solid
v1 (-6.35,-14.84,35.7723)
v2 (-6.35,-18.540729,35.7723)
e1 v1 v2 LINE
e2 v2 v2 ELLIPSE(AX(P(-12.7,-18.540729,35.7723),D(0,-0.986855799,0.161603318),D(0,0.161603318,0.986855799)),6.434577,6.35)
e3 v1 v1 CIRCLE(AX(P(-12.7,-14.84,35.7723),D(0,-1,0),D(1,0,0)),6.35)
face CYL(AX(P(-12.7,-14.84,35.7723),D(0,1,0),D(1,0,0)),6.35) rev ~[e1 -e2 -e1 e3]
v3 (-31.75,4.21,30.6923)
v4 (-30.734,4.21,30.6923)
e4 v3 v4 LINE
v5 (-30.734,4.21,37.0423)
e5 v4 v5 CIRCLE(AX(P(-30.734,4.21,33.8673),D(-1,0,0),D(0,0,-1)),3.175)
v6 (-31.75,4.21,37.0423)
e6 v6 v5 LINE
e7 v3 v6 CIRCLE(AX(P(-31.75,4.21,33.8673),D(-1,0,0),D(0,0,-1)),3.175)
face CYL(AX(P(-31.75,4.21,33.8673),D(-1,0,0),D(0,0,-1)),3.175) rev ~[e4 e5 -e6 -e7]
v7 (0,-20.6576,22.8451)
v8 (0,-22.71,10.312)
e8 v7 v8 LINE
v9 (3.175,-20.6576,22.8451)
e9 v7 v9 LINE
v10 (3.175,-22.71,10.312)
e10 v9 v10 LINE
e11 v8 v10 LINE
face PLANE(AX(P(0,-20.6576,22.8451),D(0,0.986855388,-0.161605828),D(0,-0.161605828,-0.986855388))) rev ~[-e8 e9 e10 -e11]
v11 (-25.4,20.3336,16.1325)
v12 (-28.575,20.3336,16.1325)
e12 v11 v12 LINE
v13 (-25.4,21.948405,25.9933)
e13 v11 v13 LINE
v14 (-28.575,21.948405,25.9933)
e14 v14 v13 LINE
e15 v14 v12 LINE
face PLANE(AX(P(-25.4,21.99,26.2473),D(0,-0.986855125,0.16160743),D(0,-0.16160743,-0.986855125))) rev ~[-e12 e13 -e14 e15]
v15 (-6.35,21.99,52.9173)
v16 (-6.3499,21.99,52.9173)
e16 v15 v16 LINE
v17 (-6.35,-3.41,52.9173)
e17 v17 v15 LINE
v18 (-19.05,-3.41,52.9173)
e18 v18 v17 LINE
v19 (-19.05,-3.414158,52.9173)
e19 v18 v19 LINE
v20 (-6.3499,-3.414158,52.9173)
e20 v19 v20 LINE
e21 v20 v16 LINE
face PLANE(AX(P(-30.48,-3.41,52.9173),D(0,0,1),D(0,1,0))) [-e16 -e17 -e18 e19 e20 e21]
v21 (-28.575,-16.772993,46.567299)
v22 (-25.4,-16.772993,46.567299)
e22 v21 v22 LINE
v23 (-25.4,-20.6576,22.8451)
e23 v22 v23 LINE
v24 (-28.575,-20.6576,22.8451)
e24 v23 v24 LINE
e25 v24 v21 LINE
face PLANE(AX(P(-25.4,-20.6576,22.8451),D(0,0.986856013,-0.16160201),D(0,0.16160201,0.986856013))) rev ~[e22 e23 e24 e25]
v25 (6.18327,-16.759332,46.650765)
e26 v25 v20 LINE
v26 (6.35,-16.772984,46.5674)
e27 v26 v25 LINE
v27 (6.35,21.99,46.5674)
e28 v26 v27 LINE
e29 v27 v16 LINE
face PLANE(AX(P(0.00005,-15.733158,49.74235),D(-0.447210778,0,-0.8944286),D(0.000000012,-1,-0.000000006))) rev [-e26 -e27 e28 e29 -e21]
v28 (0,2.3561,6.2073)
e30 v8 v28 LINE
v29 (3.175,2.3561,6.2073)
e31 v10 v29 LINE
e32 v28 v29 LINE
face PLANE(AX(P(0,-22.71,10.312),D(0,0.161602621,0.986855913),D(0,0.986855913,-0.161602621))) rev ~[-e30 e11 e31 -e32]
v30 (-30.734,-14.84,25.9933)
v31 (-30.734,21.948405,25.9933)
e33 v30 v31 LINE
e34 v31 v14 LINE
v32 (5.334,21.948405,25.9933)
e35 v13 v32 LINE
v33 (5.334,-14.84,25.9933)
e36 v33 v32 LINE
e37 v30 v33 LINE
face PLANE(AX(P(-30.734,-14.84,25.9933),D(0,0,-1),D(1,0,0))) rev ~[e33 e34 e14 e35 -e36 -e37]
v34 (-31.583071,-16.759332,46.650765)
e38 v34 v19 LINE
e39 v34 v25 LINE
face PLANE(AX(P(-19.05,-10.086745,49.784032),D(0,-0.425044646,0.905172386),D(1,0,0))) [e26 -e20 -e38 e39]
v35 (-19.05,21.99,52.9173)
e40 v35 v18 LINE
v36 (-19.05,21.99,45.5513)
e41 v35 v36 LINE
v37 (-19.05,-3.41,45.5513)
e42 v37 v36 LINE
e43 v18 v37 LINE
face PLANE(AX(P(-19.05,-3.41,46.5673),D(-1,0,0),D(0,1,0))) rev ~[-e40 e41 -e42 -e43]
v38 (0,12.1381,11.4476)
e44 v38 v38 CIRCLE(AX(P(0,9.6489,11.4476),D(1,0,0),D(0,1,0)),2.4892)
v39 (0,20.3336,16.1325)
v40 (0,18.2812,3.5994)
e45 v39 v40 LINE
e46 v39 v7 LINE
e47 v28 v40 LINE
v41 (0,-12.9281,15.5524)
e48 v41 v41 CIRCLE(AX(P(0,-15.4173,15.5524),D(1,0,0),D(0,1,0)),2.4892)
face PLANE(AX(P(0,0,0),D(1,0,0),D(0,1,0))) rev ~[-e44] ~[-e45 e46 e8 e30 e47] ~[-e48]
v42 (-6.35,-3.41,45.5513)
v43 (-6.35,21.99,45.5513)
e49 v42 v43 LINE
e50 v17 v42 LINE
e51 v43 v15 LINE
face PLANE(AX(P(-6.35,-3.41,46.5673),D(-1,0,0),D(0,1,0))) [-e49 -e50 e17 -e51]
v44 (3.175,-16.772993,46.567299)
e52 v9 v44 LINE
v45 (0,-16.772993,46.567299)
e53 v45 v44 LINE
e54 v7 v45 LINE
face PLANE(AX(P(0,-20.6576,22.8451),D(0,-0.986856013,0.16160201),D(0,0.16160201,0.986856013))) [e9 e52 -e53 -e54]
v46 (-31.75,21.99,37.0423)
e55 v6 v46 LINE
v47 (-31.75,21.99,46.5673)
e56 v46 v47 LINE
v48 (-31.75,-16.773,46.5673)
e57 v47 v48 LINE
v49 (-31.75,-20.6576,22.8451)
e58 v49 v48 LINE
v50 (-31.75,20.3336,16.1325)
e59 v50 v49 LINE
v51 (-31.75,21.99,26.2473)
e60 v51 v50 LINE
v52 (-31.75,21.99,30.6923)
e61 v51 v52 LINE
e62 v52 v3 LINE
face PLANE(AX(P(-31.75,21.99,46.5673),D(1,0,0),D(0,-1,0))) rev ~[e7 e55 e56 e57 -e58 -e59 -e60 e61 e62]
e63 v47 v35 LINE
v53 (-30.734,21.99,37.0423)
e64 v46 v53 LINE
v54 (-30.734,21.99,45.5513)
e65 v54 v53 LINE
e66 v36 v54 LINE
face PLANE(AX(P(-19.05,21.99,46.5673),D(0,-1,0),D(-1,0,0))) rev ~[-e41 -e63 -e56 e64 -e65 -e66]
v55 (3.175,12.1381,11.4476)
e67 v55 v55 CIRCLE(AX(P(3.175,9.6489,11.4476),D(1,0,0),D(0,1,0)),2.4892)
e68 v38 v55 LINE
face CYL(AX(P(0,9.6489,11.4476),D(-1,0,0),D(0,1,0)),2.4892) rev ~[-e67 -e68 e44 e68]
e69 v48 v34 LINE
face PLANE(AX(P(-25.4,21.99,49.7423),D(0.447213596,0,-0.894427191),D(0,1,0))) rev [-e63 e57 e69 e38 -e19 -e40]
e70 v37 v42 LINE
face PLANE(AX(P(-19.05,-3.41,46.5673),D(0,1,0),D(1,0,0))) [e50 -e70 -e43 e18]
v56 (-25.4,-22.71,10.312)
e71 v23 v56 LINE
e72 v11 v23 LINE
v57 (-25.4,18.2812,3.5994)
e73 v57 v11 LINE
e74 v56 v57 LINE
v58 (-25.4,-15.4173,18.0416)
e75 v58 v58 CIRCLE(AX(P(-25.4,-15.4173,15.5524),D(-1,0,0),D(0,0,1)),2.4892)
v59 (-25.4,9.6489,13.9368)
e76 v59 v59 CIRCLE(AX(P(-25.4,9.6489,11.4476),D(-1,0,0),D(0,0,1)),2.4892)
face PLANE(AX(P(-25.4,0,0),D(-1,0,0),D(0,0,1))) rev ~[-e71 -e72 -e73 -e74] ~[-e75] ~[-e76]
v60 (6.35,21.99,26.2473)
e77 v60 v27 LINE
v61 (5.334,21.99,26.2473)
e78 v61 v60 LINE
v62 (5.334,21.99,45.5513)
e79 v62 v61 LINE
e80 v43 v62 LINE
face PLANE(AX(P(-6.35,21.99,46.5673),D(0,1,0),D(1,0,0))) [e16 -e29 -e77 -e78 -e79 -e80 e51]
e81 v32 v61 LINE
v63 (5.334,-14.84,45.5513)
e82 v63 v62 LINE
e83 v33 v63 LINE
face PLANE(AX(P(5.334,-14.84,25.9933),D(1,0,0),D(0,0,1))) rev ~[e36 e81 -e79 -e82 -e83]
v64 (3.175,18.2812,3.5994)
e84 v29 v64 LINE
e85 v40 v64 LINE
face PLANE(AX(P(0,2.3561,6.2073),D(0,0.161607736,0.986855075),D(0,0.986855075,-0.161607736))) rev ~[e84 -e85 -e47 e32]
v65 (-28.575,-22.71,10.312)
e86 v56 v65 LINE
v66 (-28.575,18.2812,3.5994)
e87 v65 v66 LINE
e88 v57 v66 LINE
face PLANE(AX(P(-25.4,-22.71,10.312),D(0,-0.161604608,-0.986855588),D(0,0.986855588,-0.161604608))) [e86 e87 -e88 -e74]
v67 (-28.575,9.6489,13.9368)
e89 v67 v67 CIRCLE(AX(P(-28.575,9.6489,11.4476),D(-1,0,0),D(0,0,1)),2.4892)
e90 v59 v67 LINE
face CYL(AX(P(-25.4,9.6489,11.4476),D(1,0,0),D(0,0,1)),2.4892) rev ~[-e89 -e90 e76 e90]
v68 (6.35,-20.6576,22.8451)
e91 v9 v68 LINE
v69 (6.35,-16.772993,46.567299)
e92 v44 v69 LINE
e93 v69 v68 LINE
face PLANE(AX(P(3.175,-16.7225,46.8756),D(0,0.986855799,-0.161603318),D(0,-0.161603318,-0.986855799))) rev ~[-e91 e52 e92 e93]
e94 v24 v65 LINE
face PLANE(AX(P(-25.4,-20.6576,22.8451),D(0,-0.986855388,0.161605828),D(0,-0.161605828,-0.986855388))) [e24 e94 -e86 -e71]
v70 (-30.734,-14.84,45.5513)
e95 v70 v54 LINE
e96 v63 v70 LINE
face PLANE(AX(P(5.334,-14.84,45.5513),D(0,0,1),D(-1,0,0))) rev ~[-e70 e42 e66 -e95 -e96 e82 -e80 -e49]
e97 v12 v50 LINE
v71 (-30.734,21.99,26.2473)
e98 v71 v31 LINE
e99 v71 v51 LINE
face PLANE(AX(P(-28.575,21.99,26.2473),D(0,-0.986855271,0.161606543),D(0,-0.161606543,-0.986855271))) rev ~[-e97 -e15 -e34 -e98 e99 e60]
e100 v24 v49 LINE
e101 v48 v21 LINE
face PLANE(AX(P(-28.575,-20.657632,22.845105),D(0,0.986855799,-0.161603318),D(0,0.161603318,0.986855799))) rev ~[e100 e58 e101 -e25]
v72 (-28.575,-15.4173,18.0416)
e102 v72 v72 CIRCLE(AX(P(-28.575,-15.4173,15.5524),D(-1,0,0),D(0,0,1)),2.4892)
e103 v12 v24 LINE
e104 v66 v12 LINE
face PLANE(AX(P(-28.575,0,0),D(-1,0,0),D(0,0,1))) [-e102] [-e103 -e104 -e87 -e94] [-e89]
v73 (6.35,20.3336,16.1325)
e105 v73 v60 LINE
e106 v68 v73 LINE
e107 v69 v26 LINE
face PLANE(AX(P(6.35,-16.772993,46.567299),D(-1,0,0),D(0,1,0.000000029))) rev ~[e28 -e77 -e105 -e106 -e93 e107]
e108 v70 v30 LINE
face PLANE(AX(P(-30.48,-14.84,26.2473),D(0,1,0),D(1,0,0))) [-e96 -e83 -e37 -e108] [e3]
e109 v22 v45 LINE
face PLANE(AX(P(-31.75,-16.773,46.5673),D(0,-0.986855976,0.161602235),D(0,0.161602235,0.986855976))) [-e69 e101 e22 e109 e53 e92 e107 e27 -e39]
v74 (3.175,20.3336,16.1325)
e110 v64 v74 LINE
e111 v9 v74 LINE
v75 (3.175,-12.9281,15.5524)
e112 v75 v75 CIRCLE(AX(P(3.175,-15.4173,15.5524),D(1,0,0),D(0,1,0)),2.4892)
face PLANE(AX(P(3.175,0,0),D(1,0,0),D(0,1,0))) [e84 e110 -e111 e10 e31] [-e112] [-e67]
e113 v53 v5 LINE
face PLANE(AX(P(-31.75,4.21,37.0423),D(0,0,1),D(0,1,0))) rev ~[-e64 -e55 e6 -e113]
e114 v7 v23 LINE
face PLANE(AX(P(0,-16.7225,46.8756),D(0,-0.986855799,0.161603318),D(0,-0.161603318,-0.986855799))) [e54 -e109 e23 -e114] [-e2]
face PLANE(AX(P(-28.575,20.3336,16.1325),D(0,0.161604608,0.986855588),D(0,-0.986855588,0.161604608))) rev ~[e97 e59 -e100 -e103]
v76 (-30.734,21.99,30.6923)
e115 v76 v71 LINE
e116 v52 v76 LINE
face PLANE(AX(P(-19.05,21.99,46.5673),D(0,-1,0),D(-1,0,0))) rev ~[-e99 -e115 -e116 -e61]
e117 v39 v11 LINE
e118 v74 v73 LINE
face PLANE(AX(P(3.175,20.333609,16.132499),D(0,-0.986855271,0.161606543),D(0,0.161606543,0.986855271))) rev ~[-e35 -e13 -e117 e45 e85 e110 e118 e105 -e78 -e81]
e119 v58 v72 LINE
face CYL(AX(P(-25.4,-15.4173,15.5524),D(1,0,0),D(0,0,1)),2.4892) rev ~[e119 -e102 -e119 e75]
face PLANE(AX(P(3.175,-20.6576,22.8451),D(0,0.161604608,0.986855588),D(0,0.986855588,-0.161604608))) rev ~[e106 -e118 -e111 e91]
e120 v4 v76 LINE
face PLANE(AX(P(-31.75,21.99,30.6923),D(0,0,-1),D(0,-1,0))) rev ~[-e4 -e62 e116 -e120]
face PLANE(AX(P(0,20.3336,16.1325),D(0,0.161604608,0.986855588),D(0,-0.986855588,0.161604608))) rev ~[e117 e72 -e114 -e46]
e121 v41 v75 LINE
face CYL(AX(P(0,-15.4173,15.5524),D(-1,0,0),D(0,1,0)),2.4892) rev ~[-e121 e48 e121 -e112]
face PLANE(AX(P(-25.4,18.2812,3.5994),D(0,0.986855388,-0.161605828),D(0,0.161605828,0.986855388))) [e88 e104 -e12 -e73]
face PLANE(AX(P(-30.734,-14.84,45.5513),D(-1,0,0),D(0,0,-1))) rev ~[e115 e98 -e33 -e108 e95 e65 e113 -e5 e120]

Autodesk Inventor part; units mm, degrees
ref_plane "YZ Plane Vertical Spine" through (0, 0, 0) normal (1, 0, 0) x (0, 1, 0)
ref_plane "XZ Plane Horizontal" through (0, 0, 0) normal (0, 1, 0) x (-1, 0, 0)
ref_plane "XY Plane Vertical Span" through (0, 0, 0) normal (0, 0, 1) x (1, 0, 0)
sketch "Sketch1" plane through (0, 0, 0) normal (1, 0, 0) x (0, 1, 0)
  circle A0 centre (9.6489, 11.4476) radius 2.4892
  line L0 (2.3561, 6.2073) -> (18.2812, 3.5994)
  line L1 (33.7025, 135.9395) -> (135.3025, 135.9395) construction
  line L2 (21.99, 26.2473) -> (-14.84, 26.2473)
  line L3 (4.4085, 18.7403) -> (-20.6576, 22.8451)
  line L4 (-20.6576, 22.8451) -> (-22.71, 10.312)
  line L5 (-22.71, 10.312) -> (2.3561, 6.2073)
  circle A1 centre (-15.4173, 15.5524) radius 2.4892
  line L6 (-14.84, 26.2473) -> (-14.84, 46.5673)
  line L7 (-20.6576, 22.8451) -> (-16.7225, 46.8756)
  line L8 (-16.7225, 46.8756) -> (-14.84, 46.5673)
  line L9 (21.99, 26.2473) -> (18.2812, 3.5994)
  line L10 (20.3336, 16.1325) -> (4.4085, 18.7403)
  dimension "d11" = 12.7
  dimension "d13" = 4.9784
  dimension "d14" = 20.32
extrude "Extrusion1" add sketch "Sketch1" along normal blind 3.175
sketch "Sketch2" plane through (0, 0, 0) normal (-1, 0, 0) x (0, 0, 1)
  line L0 (26.2473, 21.99) -> (26.2473, -14.84) projected
  line L1 (3.5994, 18.2812) -> (26.2473, 21.99) projected
  line L2 (26.2473, -14.84) -> (46.5673, -14.84) projected
  line L3 (46.8756, -16.7225) -> (10.312, -22.71) projected
  line L4 (16.1325, 20.3336) -> (22.8451, -20.6576)
  line L5 (16.1325, 20.3336) -> (26.2473, 21.99)
  line L6 (26.2473, 21.5334) -> (26.2473, -14.84)
  line L7 (26.2473, -14.84) -> (46.5673, -14.84)
  line L8 (46.5673, -14.84) -> (46.8756, -16.7225)
  line L9 (46.8756, -16.7225) -> (22.8451, -20.6576)
extrude "Extrusion2" add sketch "Sketch2" along normal blind 25.4
sketch "Sketch3" plane through (-25.4, 0, 0) normal (-1, 0, 0) x (0, 0, 1)
  line L0 (26.2473, -14.84) -> (26.2473, 21.99) projected
  line L1 (3.5994, 18.2812) -> (16.1325, 20.3336) projected
  line L2 (26.2473, 21.99) -> (16.1325, 20.3336) projected
  line L3 (46.5673, -14.84) -> (26.2473, -14.84) projected
  line L4 (46.8756, -16.7225) -> (46.5673, -14.84) projected
  line L5 (22.8451, -20.6576) -> (46.8756, -16.7225) projected
  line L6 (22.8451, -20.6576) -> (10.312, -22.71) projected
  line L7 (10.312, -22.71) -> (3.5994, 18.2812) projected
  circle A0 centre (15.5524, -15.4173) radius 2.4892 projected
  circle A1 centre (11.4476, 9.6489) radius 2.4892 projected
extrude "Extrusion3" add sketch "Sketch3" along normal blind 3.175
sketch "Sketch4" plane through (-28.575, 0, 0) normal (-1, 0, 0) x (0, 0, 1)
  line L0 (26.2473, 21.99) -> (3.5994, 18.2812) projected
  line L1 (26.2473, -14.84) -> (26.2473, 21.99) projected
  line L2 (46.5673, -14.84) -> (26.2473, -14.84) projected
  line L3 (46.8756, -16.7225) -> (46.5673, -14.84) projected
  line L4 (10.312, -22.71) -> (46.8756, -16.7225) projected
  line L5 (46.8756, -16.7225) -> (46.5673, -14.84) projected
  line L6 (46.5673, -14.84) -> (26.2473, -14.84) projected
  line L7 (26.2473, -14.84) -> (26.2473, 21.99) projected
  line L8 (26.2473, 21.99) -> (3.5994, 18.2812) projected
  line L9 (3.5994, 18.2812) -> (10.312, -22.71) projected
  line L10 (10.312, -22.71) -> (46.8756, -16.7225) projected
  circle A0 centre (11.4476, 9.6489) radius 2.4892 projected
  circle A1 centre (15.5524, -15.4173) radius 2.4892 projected
  line L11 (16.1325, 20.3336) -> (22.8451, -20.6576)
  line L12 (16.1325, 20.3336) -> (26.2473, 21.99)
  line L13 (26.2473, 21.99) -> (26.2473, -14.84)
  line L14 (46.5673, -14.84) -> (26.2473, -14.84)
  line L15 (46.5673, -14.84) -> (46.8756, -16.7225)
  line L16 (46.8756, -16.7225) -> (22.8451, -20.6576)
extrude "Extrusion4" add sketch "Sketch4" along normal blind 3.175 contours L1 L2 L3 L4 L11 L0
sketch "Sketch5" plane through (3.175, 0, 0) normal (1, 0, 0) x (0, 0, -1)
  line L0 (-22.8451, -20.6576) -> (-16.1325, 20.3336) projected
  line L1 (-46.8756, -16.7225) -> (-10.312, -22.71) projected
  line L2 (-26.2473, -14.84) -> (-46.5673, -14.84) projected
  line L3 (-26.2473, 21.99) -> (-26.2473, -14.84) projected
  line L4 (-3.5994, 18.2812) -> (-26.2473, 21.99) projected
  line L5 (-26.2473, 21.99) -> (-16.1325, 20.3336)
  line L6 (-16.1325, 20.3336) -> (-22.8451, -20.6576)
  line L7 (-22.8451, -20.6576) -> (-46.8756, -16.7225)
  line L8 (-46.8756, -16.7225) -> (-46.5673, -14.84)
  line L9 (-46.5673, -14.84) -> (-26.2473, -14.84)
  line L10 (-26.2473, -14.84) -> (-26.2473, 21.99)
extrude "Extrusion5" add sketch "Sketch5" along normal blind 3.175
sketch "Sketch6" plane through (-31.75, -14.84, 46.5673) normal (0, 1, 0) x (1, 0, 0)
  line L0 (38.1, 20.32) -> (38.1, 0) projected
  line L1 (0, 0) -> (0, 20.32) projected
  line L2 (0, 20.32) -> (1.27, 20.32)
  line L3 (0, 0) -> (1.27, 0)
  line L4 (1.27, 0) -> (1.27, 20.32)
  line L5 (38.1, 0) -> (38.1, 20.32)
  line L6 (38.1, 20.32) -> (36.83, 20.32)
  line L7 (36.83, 20.32) -> (36.83, 0)
  line L8 (36.83, 0) -> (38.1, 0)
  dimension "d24" = 1.27
  dimension "d25" = 1.27
  dimension "d26" = 1.27
extrude "Extrusion6" add sketch "Sketch6" along normal blind 36.83
sketch "Sketch7" plane through (-30.48, -14.84, 26.2473) normal (0, 1, 0) x (1, 0, 0)
  line L0 (0, -20.32) -> (35.56, -20.32) projected
  line L1 (0, -19.05) -> (35.56, -19.05)
  line L2 (0, -20.32) -> (35.56, -20.32)
  line L3 (35.56, -19.05) -> (35.56, -20.32)
  line L4 (0, -19.05) -> (0, -20.32)
  dimension "d29" = 1.27
extrude "Extrusion7" add sketch "Sketch7" along normal blind 11.43
sketch "Sketch8" plane through (-30.48, -14.84, 26.2473) normal (1, 0, 0) x (0, 0, -1)
  line L0 (-20.32, 11.43) -> (-20.32, 36.83) projected
  line L1 (-19.05, 11.43) -> (-19.05, 36.83)
  line L2 (-19.05, 36.83) -> (-20.32, 36.83)
  line L3 (-19.05, 11.43) -> (-20.32, 11.43)
  line L4 (-20.32, 11.43) -> (-20.32, 36.83)
  dimension "d32" = 1.27
extrude "Extrusion8" add sketch "Sketch8" along normal blind 11.43
sketch "Sketch9" plane through (5.08, -14.84, 26.2473) normal (-1, 0, 0) x (0, 0, 1)
  line L0 (20.32, 11.43) -> (20.32, 36.83) projected
  line L1 (19.0567, 11.43) -> (19.0567, 36.83)
  line L2 (19.0567, 36.83) -> (20.32, 36.83)
  line L3 (20.32, 36.83) -> (20.32, 11.43)
  line L4 (20.32, 11.43) -> (19.0567, 11.43)
extrude "Extrusion9" add sketch "Sketch9" along normal blind 11.43
sketch "Sketch10" plane through (-31.75, 0, 0) normal (-1, 0, 0) x (0, 0, 1)
  line L0 (46.5673, -14.84) -> (46.5673, 21.99) projected
  line L1 (22.8451, -20.6576) -> (46.8756, -16.7225) projected
  line L2 (46.5673, -14.84) -> (46.5673, -16.773)
  line L3 (46.5673, -16.773) -> (47.6603, -17.0438)
  line L4 (47.6603, -17.0438) -> (46.5673, -14.84)
extrude "Extrusion10" cut sketch "Sketch10" against normal blind 50.8
thicken "Thicken1" operation add thickness 6.35 both sides no extend neighbours no toward (0, 0, 1) faces at (-10.5833, -12.3187, 46.5673)
sketch "Sketch11" plane through (-31.75, 0, 0) normal (-1, 0, 0) x (0, 0, 1)
  line L0 (22.8451, -20.6576) -> (46.5673, -16.773) projected
  line L1 (46.5673, -16.773) -> (55.5301, -15.3053)
  line L2 (55.5301, -15.3053) -> (55.5301, -20.6762)
  line L3 (55.5301, -20.6762) -> (46.5673, -16.773)
extrude "Extrusion11" cut sketch "Sketch11" against normal blind 50.8
chamfer "Chamfer1" distance 6.35 distance2 12.7 1 edges at (-31.75, 3.1284, 52.9173) measured on face at (-31.75, -4.8003, 34.0032)
chamfer "Chamfer2" distance 6.35 distance2 12.7 1 edges at (6.35, 3.1284, 52.9173) measured on face at (6.35, -4.8003, 34.0032)
chamfer "Chamfer3" distance 6.35 distance2 12.319 1 edges at (-12.7, -15.7331, 52.9173) measured on face at (-14.8167, -19.0161, 32.8692)
sketch "Sketch13" plane through (-31.75, 0, 0) normal (-1, 0, 0) x (0, 0, 1)
  line L0 (26.2473, 21.99) -> (46.5673, 21.99) projected
  line L1 (37.0423, 21.99) -> (33.8673, 21.99)
  line L2 (30.6923, 21.99) -> (30.6923, 4.21)
  line L3 (37.0423, 4.21) -> (37.0423, 21.99)
  line L4 (37.0423, 21.99) -> (30.6923, 21.99)
  arc A0 (30.6923, 4.21) -> (37.0423, 4.21) centre (33.8673, 4.21) ccw
  point P0 (30.6923, 4.21)
extrude "Extrusion12" cut sketch "Sketch13" against normal blind 25.4
sketch "Sketch14" plane through (-30.48, -14.84, 26.2473) normal (0, 1, 0) x (1, 0, 0)
  line L0 (0, -19.05) -> (35.56, -19.05) projected
  line L1 (35.56, -19.05) -> (35.56, 0) projected
  line L2 (0, 0) -> (35.56, 0) projected
  line L3 (0, 0) -> (0, -19.05) projected
  line L4 (35.814, 0.254) -> (35.814, -19.304)
  line L5 (35.814, -19.304) -> (-0.254, -19.304)
  line L6 (-0.254, -19.304) -> (-0.254, 0.254)
  line L7 (-0.254, 0.254) -> (35.814, 0.254)
  dimension "d57" = 0.254
extrude "Extrusion13" cut sketch "Sketch14" along normal blind 50.8 contours L3 L2 L1 L0 | L4 L5 L6 L7
sketch "Sketch15" plane through (-30.734, -14.84, 45.5513) normal (0, 1, 0) x (1, 0, 0)
  line L0 (0, 19.558) -> (0, 0) projected
  line L1 (0, 0) -> (36.068, 0) projected
  line L2 (36.068, 0) -> (36.068, 19.558) projected
  line L3 (36.068, 19.558) -> (0, 19.558) projected
  line L4 (0, 9.779) -> (36.068, 9.779)
  line L5 (18.034, 0) -> (18.034, 19.558)
  circle A0 centre (18.034, 9.779) radius 6.35
  dimension "d60" = 12.7
extrude "Extrusion14" cut sketch "Sketch15" against normal blind 50.8 contours A0 L5 L4 | L4 L5 A0 | A0 L4 L5 | L4 A0 L5
properties part number "back_mount_3DPrint"
